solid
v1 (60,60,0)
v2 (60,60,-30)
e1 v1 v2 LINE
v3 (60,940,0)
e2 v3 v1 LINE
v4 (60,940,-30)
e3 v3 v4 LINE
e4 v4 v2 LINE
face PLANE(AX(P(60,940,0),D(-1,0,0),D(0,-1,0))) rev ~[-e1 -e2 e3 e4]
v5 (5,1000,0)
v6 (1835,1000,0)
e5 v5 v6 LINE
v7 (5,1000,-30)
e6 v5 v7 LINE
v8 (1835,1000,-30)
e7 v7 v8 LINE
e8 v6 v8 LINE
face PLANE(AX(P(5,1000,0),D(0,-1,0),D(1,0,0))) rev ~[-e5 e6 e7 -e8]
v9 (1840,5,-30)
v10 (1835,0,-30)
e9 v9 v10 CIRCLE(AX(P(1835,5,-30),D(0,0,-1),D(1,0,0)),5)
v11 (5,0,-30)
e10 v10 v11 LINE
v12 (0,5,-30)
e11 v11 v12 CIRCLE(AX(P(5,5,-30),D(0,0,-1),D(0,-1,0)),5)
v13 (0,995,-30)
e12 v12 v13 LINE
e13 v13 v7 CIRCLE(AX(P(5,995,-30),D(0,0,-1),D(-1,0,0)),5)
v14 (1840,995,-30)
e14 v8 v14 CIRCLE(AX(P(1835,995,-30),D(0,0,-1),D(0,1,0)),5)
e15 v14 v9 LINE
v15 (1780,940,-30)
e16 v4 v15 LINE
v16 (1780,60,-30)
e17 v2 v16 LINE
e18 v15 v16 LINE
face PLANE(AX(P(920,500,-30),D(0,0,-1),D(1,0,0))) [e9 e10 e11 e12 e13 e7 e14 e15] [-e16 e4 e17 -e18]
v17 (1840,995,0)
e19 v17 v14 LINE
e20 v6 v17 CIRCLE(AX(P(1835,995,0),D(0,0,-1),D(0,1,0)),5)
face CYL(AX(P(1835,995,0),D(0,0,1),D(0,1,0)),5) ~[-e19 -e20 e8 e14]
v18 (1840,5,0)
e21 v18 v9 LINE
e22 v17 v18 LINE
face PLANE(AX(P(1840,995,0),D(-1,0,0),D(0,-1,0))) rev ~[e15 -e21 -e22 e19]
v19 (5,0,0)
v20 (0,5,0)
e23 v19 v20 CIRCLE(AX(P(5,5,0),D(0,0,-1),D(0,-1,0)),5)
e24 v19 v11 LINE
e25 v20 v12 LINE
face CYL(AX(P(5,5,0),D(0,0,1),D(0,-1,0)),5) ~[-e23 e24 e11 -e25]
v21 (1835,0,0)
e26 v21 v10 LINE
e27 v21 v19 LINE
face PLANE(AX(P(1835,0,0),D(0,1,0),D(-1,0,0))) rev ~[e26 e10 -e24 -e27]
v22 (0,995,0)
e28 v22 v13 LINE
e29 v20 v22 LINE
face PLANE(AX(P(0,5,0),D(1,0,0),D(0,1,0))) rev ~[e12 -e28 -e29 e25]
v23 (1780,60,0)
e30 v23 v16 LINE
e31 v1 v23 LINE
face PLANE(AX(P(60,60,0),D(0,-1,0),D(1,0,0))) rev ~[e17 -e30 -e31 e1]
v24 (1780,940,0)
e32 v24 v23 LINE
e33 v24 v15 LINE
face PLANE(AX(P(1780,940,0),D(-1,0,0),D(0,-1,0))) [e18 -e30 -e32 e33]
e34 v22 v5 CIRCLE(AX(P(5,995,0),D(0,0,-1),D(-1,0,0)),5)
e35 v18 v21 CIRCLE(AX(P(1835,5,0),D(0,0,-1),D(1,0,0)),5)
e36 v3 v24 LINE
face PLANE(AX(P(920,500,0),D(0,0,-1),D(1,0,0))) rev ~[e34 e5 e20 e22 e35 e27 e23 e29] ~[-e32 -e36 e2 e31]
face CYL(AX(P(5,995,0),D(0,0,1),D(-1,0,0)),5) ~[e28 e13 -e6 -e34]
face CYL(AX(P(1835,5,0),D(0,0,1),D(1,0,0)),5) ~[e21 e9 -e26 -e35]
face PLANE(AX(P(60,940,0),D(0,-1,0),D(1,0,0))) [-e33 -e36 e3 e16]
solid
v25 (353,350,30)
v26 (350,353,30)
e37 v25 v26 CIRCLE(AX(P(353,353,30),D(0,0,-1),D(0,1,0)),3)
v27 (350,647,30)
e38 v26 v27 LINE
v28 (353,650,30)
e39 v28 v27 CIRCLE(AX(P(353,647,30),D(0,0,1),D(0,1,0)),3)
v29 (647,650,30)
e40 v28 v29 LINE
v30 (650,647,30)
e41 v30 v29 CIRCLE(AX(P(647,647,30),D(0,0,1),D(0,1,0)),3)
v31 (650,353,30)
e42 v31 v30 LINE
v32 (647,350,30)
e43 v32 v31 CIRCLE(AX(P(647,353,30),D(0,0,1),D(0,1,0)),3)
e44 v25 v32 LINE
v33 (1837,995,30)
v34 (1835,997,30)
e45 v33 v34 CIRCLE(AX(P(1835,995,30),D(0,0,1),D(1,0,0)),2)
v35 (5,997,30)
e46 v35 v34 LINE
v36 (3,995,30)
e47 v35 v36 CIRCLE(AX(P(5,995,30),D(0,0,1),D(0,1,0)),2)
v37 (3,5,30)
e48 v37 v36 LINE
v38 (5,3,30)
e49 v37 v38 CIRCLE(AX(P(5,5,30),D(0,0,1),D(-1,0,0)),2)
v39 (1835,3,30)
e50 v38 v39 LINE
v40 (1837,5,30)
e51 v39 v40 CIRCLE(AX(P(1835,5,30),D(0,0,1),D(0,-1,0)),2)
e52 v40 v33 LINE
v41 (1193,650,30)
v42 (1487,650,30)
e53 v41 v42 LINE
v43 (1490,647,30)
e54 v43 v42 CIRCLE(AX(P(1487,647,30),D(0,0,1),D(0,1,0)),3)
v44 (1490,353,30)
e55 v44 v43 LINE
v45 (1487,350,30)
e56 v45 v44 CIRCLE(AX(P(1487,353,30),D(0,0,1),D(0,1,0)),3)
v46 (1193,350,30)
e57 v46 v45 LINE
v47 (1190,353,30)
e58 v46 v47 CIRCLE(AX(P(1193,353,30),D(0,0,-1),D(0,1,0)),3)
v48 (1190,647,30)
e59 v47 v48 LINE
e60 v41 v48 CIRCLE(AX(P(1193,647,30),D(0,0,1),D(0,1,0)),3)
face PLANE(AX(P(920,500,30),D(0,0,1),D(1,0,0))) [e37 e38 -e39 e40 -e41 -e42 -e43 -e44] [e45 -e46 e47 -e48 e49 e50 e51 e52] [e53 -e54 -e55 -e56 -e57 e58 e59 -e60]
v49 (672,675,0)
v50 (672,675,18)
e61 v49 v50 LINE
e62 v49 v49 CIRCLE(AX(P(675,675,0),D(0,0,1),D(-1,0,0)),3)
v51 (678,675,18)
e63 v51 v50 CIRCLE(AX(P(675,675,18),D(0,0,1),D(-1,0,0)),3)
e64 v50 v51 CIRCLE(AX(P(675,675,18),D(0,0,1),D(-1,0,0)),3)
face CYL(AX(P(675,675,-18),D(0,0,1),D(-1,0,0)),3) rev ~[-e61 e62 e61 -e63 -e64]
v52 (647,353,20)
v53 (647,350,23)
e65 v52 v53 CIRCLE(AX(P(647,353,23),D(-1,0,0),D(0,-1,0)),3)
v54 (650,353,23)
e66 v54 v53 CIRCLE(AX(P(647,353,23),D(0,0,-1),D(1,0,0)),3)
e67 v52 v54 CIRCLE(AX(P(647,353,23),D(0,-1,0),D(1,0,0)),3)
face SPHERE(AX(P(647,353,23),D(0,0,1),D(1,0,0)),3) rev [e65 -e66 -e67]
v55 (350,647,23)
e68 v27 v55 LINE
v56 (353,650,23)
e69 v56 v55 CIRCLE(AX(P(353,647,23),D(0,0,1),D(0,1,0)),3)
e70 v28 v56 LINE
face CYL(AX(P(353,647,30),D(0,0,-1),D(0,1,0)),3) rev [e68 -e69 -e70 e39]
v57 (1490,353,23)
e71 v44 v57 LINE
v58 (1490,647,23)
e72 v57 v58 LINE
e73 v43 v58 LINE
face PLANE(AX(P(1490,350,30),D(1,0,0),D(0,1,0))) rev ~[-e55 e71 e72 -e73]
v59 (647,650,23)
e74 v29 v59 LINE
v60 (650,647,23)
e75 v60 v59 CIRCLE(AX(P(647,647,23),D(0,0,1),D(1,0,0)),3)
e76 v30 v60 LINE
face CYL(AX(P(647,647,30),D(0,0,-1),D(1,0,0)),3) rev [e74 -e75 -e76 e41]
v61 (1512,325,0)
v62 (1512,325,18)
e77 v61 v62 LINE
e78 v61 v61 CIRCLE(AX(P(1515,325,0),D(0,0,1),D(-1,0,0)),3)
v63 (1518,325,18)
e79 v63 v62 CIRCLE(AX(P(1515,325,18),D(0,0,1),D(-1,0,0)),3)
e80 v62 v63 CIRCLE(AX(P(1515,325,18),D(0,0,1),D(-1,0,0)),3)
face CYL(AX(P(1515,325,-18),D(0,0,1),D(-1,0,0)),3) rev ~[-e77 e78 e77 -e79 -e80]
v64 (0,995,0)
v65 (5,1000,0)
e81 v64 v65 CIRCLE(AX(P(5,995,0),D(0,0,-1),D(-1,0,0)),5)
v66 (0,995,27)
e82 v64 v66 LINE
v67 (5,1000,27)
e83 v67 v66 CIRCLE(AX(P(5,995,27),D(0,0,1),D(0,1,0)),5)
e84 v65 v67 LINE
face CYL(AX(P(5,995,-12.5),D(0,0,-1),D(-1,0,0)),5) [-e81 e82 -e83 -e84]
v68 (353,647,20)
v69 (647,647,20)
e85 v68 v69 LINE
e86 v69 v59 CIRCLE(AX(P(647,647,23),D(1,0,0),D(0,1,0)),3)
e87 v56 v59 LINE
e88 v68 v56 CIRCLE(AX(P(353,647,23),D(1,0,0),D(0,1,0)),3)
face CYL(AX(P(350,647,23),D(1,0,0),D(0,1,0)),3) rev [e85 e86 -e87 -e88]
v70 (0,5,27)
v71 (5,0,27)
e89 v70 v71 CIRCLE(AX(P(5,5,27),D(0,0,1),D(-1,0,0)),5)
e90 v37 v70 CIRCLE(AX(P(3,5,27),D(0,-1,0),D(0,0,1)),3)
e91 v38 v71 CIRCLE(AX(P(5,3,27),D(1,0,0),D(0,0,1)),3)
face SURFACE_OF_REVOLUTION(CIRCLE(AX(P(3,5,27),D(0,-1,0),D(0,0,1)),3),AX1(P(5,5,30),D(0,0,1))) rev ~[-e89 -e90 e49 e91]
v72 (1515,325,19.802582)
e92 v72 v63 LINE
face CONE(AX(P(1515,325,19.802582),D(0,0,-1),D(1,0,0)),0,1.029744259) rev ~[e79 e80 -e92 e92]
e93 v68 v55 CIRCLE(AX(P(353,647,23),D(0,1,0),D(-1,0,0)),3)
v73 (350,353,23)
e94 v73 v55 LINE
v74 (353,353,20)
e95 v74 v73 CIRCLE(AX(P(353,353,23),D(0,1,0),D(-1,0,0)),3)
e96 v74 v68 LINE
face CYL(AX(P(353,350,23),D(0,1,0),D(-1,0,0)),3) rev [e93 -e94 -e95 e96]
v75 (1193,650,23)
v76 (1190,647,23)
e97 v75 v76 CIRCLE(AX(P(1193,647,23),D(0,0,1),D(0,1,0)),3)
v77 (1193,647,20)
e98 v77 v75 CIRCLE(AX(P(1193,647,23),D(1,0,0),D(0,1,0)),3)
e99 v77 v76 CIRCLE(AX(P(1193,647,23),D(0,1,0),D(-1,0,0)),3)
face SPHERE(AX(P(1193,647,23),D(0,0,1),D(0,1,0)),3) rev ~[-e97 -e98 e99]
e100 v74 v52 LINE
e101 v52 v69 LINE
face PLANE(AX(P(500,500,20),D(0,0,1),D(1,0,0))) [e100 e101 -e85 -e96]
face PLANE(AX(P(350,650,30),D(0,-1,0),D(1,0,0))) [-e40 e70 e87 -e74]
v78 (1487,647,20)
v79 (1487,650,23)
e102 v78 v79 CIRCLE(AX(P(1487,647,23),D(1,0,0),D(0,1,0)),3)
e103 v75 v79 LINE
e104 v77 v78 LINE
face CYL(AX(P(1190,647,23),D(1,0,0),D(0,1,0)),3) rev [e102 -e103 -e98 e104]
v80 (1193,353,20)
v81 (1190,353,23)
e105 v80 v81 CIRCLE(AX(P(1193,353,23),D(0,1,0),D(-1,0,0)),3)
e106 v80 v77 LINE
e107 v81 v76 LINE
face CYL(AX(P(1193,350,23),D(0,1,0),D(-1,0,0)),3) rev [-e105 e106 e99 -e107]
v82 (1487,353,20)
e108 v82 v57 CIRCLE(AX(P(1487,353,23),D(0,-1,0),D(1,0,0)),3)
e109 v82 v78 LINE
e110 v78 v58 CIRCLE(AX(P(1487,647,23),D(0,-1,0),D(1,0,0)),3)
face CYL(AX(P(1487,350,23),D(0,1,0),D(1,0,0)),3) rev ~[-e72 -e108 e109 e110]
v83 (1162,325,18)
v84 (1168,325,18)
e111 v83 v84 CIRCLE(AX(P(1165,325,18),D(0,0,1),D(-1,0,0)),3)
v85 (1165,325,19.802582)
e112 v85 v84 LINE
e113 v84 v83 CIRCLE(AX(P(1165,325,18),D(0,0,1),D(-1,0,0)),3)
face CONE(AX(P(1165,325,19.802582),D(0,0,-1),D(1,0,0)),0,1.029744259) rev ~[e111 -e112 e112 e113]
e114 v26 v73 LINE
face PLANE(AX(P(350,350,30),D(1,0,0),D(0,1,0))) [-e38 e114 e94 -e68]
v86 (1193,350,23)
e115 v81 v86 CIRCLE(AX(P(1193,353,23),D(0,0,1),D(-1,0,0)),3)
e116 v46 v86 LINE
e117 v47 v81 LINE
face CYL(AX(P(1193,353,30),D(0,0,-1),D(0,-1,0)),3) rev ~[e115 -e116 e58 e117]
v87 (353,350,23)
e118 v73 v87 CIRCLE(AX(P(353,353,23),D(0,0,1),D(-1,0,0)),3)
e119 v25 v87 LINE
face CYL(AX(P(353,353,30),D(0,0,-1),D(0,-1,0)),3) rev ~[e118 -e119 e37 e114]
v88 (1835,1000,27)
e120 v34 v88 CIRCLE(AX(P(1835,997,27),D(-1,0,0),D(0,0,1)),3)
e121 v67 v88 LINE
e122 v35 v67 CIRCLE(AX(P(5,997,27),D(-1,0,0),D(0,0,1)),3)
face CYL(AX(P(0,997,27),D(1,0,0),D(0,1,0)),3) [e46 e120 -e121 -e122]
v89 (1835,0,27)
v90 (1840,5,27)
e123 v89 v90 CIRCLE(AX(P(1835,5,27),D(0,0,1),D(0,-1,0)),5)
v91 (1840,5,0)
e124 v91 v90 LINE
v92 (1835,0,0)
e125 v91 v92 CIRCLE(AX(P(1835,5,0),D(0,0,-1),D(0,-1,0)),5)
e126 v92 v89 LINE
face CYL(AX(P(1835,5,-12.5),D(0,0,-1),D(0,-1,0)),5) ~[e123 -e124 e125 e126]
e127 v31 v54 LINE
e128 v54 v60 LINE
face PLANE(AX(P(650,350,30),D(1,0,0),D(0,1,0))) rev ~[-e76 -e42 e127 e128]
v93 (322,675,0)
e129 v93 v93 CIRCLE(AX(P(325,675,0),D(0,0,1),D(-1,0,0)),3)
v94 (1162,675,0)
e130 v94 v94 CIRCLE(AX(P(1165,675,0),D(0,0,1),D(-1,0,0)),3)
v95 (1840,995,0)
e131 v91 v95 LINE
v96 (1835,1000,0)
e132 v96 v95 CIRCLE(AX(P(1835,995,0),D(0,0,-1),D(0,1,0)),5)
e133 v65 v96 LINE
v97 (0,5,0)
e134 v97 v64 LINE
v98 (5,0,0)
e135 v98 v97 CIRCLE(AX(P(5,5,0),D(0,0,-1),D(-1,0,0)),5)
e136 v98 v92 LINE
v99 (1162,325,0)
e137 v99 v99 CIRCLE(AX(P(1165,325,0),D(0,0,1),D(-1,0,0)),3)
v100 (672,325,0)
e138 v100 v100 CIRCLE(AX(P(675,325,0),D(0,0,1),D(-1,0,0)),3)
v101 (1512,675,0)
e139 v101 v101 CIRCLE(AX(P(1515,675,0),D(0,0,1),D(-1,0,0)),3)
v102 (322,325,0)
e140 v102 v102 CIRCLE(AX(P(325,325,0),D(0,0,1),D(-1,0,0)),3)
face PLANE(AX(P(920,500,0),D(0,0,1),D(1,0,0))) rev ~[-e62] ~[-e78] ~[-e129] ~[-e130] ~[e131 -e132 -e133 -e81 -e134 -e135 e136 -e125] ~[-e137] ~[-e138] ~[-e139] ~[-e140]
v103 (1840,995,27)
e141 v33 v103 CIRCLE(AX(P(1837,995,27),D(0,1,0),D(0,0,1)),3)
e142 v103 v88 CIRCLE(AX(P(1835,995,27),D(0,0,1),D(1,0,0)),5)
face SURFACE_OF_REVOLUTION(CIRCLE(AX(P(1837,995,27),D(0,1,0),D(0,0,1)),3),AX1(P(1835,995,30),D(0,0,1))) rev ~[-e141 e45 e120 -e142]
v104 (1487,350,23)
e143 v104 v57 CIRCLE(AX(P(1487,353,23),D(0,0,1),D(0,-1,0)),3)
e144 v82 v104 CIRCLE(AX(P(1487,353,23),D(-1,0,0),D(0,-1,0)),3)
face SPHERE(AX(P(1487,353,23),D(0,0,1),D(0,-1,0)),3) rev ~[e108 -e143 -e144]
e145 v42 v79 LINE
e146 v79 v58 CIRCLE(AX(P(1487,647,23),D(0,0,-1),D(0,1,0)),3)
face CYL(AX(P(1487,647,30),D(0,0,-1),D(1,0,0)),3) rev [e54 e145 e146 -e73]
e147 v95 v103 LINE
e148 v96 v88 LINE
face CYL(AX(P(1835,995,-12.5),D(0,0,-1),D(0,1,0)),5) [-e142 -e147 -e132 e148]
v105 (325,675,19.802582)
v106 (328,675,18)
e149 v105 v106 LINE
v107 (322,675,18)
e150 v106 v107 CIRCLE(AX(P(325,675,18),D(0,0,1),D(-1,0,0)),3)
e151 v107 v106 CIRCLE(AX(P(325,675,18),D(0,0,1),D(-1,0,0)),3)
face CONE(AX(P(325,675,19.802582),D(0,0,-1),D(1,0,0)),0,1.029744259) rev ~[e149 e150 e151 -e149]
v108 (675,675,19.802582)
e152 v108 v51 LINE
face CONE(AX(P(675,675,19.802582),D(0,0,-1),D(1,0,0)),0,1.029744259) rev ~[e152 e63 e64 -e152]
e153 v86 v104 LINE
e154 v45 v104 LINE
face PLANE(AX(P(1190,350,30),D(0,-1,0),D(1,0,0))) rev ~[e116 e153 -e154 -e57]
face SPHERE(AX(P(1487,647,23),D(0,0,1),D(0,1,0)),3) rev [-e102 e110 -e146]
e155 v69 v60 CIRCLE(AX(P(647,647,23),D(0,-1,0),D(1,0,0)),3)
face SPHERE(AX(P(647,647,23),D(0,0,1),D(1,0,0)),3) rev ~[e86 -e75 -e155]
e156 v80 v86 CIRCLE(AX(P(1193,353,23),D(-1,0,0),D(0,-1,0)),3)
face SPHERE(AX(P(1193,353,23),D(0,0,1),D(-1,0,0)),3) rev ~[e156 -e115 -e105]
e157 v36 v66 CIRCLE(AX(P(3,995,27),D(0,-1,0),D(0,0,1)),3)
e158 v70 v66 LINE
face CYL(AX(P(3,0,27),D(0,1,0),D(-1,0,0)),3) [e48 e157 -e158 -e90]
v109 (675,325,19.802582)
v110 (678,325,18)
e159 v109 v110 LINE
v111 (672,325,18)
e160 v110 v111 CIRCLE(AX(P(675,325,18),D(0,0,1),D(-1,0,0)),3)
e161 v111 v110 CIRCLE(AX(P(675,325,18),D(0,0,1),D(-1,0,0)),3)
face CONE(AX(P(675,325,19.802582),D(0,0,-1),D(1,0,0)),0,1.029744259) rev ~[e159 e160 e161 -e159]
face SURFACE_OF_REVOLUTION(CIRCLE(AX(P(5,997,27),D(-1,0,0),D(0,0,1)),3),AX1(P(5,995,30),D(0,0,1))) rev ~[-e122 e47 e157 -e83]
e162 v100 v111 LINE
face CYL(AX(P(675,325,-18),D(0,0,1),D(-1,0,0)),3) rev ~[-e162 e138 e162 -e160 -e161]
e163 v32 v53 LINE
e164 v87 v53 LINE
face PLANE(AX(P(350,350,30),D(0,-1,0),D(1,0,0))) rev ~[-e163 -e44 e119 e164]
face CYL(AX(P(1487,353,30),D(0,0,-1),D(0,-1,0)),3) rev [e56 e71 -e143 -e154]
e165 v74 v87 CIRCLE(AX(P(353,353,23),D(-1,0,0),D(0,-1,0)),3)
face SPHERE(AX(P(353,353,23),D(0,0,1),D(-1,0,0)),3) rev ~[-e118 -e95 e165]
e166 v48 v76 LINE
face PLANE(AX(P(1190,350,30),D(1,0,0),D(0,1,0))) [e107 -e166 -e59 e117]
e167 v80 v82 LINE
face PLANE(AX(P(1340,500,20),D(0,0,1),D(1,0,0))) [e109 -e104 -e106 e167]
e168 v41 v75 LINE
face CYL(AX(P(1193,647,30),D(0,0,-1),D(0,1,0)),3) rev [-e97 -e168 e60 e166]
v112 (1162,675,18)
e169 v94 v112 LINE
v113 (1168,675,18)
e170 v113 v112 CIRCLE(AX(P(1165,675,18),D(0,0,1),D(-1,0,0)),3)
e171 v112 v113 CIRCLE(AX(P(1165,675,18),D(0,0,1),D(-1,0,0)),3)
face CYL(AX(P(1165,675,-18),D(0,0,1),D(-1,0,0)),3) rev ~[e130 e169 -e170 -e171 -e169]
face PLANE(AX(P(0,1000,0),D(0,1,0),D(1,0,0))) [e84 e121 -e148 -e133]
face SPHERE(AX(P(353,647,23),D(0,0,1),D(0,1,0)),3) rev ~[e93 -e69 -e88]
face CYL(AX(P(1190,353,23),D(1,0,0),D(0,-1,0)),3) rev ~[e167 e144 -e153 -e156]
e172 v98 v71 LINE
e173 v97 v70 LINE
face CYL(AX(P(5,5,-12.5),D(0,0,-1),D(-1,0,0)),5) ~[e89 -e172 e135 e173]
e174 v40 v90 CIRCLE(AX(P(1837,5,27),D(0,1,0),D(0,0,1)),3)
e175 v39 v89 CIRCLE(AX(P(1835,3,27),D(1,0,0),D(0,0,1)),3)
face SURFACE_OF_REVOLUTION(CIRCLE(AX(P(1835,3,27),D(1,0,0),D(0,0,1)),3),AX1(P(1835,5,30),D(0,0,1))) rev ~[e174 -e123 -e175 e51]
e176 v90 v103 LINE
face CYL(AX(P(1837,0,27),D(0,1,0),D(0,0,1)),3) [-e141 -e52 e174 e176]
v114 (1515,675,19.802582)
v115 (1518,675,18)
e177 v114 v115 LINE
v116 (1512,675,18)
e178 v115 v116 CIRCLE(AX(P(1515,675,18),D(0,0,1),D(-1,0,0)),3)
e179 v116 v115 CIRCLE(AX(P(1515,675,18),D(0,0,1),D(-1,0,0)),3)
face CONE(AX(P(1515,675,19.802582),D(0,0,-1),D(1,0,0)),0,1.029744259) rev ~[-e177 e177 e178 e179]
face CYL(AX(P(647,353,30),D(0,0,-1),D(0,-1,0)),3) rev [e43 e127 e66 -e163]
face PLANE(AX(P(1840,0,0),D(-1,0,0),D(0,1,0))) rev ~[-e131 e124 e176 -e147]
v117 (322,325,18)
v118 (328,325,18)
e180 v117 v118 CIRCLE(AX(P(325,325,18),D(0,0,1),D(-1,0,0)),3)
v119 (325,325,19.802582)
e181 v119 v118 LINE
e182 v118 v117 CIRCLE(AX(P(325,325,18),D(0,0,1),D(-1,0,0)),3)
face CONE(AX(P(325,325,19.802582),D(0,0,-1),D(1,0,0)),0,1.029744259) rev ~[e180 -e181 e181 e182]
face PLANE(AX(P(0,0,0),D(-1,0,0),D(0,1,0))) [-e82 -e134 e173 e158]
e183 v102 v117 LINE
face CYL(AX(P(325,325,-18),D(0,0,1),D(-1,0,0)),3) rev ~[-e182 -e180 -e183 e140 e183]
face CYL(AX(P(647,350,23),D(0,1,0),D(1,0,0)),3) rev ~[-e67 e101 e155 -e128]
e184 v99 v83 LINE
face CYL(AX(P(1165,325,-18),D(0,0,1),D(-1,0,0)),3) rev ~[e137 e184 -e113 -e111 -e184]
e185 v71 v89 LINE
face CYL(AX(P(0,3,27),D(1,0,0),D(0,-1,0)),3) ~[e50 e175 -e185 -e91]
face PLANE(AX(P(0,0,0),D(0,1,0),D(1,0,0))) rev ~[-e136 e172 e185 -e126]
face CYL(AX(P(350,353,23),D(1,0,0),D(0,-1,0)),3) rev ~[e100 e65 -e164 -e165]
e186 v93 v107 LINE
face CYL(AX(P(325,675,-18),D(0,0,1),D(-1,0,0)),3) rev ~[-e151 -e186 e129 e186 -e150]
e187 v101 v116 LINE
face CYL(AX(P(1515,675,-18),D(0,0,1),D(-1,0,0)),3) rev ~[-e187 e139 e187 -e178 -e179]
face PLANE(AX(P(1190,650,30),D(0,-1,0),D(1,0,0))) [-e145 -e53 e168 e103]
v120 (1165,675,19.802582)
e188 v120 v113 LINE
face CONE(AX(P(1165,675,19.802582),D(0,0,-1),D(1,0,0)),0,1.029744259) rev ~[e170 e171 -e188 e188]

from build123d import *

# Parameters (mm, degrees)
F0_W         = 1840
F0_H         = 1000
F1_DEPTH     = 30
F2_W         = 300
F2_H         = 300
F3_DEPTH     = 10
F4_R         = 3
F5_T1_DEPTH  = 42.5
F5_T4_ANGLE  = 90
F5_T6_ANGLE  = 90
F5_T8_ANGLE  = 90
F5_T10_ANGLE = 90
F7_D         = 6
F7_DEPTH     = 18
F7_TIP       = 1.8025818571
F8_W         = 1720
F8_H         = 880
F9_DEPTH     = 30


# Not quite as in the source:
# - a fillet or chamfer that OpenCascade refuses, or shapes differently, is made with other operations: its cross-section is extruded or revolved along the edge and cut away or added


with BuildPart() as f1:
    # F0 (on Top) → F1 (new body)
    with BuildSketch(Plane.XY):
        with Locations((920, 500)):
            Rectangle(F0_W, F0_H)
    extrude(amount=F1_DEPTH)

    # F2 (on face) → F3 (cut)
    with BuildSketch(Plane.XY.offset(30)):
        with Locations((1340, 500)):
            Rectangle(F2_W, F2_H)
        with Locations((500, 500)):
            Rectangle(F2_W, F2_H)
    extrude(amount=-F3_DEPTH, mode=Mode.SUBTRACT)

    # F4
    f4_edges = [f1.edges().sort_by_distance(p)[0] for p in [
        (1490, 650, 25),
        (1190, 650, 25),
        (1190, 350, 25),
        (1490, 350, 25),
        (650, 650, 25),
        (350, 650, 25),
        (350, 350, 25),
        (650, 350, 25),
        (1340, 650, 20),
        (1190, 500, 20),
        (1340, 350, 20),
        (1490, 500, 20),
        (650, 500, 20),
        (500, 650, 20),
        (350, 500, 20),
        (500, 350, 20),
        (0, 500, 30),
        (920, 0, 30),
        (1840, 500, 30),
        (920, 1000, 30),
    ]]
    fillet(f4_edges, radius=F4_R)

    # F5: fillet of radius 5 on 4 edges, made by hand

    # F5_s2 → F5_t1 (cut)
    with BuildSketch(Plane.XY.offset(-12.5)):
        with BuildLine():
            ThreePointArc((1835, 1000), (1838.5355339059, 998.5355339059), (1840, 995))
            Line((1840, 995), (1840, 1000))
            Line((1840, 1000), (1835, 1000))
        make_face()
        with BuildLine():
            ThreePointArc((1835, 0), (1838.5355339059, 1.4644660941), (1840, 5))
            Line((1840, 5), (1840, 0))
            Line((1840, 0), (1835, 0))
        make_face()
        with BuildLine():
            ThreePointArc((0, 5), (1.4644660941, 1.4644660941), (5, 0))
            Line((5, 0), (0, 0))
            Line((0, 0), (0, 5))
        make_face()
        with BuildLine():
            ThreePointArc((0, 995), (1.4644660941, 998.5355339059), (5, 1000))
            Line((5, 1000), (0, 1000))
            Line((0, 1000), (0, 995))
        make_face()
    extrude(amount=F5_T1_DEPTH, mode=Mode.SUBTRACT)

    # F5_s3 → F5_t4 (revolve, cut)
    with BuildSketch(Plane.YZ.offset(5)):
        with BuildLine():
            ThreePointArc((997, 30), (999.1213203436, 29.1213203436), (1000, 27))
            Line((1000, 27), (1000, 30))
            Line((1000, 30), (997, 30))
        make_face()
    revolve(axis=Axis((5, 995, 30), (0, 0, 1)), revolution_arc=F5_T4_ANGLE, mode=Mode.SUBTRACT)

    # F5_s5 → F5_t6 (revolve, cut)
    with BuildSketch(Plane.XZ.offset(-5)):
        with BuildLine():
            ThreePointArc((3, 30), (0.8786796564, 29.1213203436), (0, 27))
            Line((0, 27), (0, 30))
            Line((0, 30), (3, 30))
        make_face()
    revolve(axis=Axis((5, 5, 30), (0, 0, 1)), revolution_arc=F5_T6_ANGLE, mode=Mode.SUBTRACT)

    # F5_s7 → F5_t8 (revolve, cut)
    with BuildSketch(Plane.YZ.offset(1835)):
        with BuildLine():
            ThreePointArc((3, 30), (0.8786796564, 29.1213203436), (0, 27))
            Line((0, 27), (0, 30))
            Line((0, 30), (3, 30))
        make_face()
    revolve(axis=Axis((1835, 5, 30), (0, 0, 1)), revolution_arc=F5_T8_ANGLE, mode=Mode.SUBTRACT)

    # F5_s9 → F5_t10 (revolve, cut)
    with BuildSketch(Plane.XZ.offset(-995)):
        with BuildLine():
            ThreePointArc((1837, 30), (1839.1213203436, 29.1213203436), (1840, 27))
            Line((1840, 27), (1840, 30))
            Line((1840, 30), (1837, 30))
        make_face()
    revolve(axis=Axis((1835, 995, 30), (0, 0, 1)), revolution_arc=F5_T10_ANGLE, mode=Mode.SUBTRACT)

    # F7
    with Locations(Plane(origin=(0, 0, 0), x_dir=(1, 0, 0), z_dir=(0, 0, -1))):
        with Locations((325, -325), (675, -325), (325, -675), (675, -675), (1165, -675), (1165, -325), (1515, -325), (1515, -675)):
            Hole(F7_D / 2, depth=F7_DEPTH)
            with Locations((0, 0, -(F7_DEPTH + F7_TIP / 2))):  # 118° drill point
                Cone(0, F7_D / 2, F7_TIP, mode=Mode.SUBTRACT)


with BuildPart() as f9:
    # F8 (on face) → F9 (new body)
    with BuildSketch(Plane(origin=(0, 0, 0), x_dir=(1, 0, 0), z_dir=(0, 0, -1))):
        with BuildLine():
            Line((1835, 0), (5, 0))
            ThreePointArc((5, 0), (1.4644660941, -1.4644660941), (0, -5))
            Line((0, -5), (0, -995))
            ThreePointArc((0, -995), (1.4644660941, -998.5355339059), (5, -1000))
            Line((5, -1000), (1835, -1000))
            ThreePointArc((1835, -1000), (1838.5355339059, -998.5355339059), (1840, -995))
            Line((1840, -995), (1840, -5))
            ThreePointArc((1840, -5), (1838.5355339059, -1.4644660941), (1835, 0))
        make_face()
        with Locations((920, -500)):
            Rectangle(F8_W, F8_H, mode=Mode.SUBTRACT)
    extrude(amount=F9_DEPTH)


solid = Compound([f1.part, f9.part])
